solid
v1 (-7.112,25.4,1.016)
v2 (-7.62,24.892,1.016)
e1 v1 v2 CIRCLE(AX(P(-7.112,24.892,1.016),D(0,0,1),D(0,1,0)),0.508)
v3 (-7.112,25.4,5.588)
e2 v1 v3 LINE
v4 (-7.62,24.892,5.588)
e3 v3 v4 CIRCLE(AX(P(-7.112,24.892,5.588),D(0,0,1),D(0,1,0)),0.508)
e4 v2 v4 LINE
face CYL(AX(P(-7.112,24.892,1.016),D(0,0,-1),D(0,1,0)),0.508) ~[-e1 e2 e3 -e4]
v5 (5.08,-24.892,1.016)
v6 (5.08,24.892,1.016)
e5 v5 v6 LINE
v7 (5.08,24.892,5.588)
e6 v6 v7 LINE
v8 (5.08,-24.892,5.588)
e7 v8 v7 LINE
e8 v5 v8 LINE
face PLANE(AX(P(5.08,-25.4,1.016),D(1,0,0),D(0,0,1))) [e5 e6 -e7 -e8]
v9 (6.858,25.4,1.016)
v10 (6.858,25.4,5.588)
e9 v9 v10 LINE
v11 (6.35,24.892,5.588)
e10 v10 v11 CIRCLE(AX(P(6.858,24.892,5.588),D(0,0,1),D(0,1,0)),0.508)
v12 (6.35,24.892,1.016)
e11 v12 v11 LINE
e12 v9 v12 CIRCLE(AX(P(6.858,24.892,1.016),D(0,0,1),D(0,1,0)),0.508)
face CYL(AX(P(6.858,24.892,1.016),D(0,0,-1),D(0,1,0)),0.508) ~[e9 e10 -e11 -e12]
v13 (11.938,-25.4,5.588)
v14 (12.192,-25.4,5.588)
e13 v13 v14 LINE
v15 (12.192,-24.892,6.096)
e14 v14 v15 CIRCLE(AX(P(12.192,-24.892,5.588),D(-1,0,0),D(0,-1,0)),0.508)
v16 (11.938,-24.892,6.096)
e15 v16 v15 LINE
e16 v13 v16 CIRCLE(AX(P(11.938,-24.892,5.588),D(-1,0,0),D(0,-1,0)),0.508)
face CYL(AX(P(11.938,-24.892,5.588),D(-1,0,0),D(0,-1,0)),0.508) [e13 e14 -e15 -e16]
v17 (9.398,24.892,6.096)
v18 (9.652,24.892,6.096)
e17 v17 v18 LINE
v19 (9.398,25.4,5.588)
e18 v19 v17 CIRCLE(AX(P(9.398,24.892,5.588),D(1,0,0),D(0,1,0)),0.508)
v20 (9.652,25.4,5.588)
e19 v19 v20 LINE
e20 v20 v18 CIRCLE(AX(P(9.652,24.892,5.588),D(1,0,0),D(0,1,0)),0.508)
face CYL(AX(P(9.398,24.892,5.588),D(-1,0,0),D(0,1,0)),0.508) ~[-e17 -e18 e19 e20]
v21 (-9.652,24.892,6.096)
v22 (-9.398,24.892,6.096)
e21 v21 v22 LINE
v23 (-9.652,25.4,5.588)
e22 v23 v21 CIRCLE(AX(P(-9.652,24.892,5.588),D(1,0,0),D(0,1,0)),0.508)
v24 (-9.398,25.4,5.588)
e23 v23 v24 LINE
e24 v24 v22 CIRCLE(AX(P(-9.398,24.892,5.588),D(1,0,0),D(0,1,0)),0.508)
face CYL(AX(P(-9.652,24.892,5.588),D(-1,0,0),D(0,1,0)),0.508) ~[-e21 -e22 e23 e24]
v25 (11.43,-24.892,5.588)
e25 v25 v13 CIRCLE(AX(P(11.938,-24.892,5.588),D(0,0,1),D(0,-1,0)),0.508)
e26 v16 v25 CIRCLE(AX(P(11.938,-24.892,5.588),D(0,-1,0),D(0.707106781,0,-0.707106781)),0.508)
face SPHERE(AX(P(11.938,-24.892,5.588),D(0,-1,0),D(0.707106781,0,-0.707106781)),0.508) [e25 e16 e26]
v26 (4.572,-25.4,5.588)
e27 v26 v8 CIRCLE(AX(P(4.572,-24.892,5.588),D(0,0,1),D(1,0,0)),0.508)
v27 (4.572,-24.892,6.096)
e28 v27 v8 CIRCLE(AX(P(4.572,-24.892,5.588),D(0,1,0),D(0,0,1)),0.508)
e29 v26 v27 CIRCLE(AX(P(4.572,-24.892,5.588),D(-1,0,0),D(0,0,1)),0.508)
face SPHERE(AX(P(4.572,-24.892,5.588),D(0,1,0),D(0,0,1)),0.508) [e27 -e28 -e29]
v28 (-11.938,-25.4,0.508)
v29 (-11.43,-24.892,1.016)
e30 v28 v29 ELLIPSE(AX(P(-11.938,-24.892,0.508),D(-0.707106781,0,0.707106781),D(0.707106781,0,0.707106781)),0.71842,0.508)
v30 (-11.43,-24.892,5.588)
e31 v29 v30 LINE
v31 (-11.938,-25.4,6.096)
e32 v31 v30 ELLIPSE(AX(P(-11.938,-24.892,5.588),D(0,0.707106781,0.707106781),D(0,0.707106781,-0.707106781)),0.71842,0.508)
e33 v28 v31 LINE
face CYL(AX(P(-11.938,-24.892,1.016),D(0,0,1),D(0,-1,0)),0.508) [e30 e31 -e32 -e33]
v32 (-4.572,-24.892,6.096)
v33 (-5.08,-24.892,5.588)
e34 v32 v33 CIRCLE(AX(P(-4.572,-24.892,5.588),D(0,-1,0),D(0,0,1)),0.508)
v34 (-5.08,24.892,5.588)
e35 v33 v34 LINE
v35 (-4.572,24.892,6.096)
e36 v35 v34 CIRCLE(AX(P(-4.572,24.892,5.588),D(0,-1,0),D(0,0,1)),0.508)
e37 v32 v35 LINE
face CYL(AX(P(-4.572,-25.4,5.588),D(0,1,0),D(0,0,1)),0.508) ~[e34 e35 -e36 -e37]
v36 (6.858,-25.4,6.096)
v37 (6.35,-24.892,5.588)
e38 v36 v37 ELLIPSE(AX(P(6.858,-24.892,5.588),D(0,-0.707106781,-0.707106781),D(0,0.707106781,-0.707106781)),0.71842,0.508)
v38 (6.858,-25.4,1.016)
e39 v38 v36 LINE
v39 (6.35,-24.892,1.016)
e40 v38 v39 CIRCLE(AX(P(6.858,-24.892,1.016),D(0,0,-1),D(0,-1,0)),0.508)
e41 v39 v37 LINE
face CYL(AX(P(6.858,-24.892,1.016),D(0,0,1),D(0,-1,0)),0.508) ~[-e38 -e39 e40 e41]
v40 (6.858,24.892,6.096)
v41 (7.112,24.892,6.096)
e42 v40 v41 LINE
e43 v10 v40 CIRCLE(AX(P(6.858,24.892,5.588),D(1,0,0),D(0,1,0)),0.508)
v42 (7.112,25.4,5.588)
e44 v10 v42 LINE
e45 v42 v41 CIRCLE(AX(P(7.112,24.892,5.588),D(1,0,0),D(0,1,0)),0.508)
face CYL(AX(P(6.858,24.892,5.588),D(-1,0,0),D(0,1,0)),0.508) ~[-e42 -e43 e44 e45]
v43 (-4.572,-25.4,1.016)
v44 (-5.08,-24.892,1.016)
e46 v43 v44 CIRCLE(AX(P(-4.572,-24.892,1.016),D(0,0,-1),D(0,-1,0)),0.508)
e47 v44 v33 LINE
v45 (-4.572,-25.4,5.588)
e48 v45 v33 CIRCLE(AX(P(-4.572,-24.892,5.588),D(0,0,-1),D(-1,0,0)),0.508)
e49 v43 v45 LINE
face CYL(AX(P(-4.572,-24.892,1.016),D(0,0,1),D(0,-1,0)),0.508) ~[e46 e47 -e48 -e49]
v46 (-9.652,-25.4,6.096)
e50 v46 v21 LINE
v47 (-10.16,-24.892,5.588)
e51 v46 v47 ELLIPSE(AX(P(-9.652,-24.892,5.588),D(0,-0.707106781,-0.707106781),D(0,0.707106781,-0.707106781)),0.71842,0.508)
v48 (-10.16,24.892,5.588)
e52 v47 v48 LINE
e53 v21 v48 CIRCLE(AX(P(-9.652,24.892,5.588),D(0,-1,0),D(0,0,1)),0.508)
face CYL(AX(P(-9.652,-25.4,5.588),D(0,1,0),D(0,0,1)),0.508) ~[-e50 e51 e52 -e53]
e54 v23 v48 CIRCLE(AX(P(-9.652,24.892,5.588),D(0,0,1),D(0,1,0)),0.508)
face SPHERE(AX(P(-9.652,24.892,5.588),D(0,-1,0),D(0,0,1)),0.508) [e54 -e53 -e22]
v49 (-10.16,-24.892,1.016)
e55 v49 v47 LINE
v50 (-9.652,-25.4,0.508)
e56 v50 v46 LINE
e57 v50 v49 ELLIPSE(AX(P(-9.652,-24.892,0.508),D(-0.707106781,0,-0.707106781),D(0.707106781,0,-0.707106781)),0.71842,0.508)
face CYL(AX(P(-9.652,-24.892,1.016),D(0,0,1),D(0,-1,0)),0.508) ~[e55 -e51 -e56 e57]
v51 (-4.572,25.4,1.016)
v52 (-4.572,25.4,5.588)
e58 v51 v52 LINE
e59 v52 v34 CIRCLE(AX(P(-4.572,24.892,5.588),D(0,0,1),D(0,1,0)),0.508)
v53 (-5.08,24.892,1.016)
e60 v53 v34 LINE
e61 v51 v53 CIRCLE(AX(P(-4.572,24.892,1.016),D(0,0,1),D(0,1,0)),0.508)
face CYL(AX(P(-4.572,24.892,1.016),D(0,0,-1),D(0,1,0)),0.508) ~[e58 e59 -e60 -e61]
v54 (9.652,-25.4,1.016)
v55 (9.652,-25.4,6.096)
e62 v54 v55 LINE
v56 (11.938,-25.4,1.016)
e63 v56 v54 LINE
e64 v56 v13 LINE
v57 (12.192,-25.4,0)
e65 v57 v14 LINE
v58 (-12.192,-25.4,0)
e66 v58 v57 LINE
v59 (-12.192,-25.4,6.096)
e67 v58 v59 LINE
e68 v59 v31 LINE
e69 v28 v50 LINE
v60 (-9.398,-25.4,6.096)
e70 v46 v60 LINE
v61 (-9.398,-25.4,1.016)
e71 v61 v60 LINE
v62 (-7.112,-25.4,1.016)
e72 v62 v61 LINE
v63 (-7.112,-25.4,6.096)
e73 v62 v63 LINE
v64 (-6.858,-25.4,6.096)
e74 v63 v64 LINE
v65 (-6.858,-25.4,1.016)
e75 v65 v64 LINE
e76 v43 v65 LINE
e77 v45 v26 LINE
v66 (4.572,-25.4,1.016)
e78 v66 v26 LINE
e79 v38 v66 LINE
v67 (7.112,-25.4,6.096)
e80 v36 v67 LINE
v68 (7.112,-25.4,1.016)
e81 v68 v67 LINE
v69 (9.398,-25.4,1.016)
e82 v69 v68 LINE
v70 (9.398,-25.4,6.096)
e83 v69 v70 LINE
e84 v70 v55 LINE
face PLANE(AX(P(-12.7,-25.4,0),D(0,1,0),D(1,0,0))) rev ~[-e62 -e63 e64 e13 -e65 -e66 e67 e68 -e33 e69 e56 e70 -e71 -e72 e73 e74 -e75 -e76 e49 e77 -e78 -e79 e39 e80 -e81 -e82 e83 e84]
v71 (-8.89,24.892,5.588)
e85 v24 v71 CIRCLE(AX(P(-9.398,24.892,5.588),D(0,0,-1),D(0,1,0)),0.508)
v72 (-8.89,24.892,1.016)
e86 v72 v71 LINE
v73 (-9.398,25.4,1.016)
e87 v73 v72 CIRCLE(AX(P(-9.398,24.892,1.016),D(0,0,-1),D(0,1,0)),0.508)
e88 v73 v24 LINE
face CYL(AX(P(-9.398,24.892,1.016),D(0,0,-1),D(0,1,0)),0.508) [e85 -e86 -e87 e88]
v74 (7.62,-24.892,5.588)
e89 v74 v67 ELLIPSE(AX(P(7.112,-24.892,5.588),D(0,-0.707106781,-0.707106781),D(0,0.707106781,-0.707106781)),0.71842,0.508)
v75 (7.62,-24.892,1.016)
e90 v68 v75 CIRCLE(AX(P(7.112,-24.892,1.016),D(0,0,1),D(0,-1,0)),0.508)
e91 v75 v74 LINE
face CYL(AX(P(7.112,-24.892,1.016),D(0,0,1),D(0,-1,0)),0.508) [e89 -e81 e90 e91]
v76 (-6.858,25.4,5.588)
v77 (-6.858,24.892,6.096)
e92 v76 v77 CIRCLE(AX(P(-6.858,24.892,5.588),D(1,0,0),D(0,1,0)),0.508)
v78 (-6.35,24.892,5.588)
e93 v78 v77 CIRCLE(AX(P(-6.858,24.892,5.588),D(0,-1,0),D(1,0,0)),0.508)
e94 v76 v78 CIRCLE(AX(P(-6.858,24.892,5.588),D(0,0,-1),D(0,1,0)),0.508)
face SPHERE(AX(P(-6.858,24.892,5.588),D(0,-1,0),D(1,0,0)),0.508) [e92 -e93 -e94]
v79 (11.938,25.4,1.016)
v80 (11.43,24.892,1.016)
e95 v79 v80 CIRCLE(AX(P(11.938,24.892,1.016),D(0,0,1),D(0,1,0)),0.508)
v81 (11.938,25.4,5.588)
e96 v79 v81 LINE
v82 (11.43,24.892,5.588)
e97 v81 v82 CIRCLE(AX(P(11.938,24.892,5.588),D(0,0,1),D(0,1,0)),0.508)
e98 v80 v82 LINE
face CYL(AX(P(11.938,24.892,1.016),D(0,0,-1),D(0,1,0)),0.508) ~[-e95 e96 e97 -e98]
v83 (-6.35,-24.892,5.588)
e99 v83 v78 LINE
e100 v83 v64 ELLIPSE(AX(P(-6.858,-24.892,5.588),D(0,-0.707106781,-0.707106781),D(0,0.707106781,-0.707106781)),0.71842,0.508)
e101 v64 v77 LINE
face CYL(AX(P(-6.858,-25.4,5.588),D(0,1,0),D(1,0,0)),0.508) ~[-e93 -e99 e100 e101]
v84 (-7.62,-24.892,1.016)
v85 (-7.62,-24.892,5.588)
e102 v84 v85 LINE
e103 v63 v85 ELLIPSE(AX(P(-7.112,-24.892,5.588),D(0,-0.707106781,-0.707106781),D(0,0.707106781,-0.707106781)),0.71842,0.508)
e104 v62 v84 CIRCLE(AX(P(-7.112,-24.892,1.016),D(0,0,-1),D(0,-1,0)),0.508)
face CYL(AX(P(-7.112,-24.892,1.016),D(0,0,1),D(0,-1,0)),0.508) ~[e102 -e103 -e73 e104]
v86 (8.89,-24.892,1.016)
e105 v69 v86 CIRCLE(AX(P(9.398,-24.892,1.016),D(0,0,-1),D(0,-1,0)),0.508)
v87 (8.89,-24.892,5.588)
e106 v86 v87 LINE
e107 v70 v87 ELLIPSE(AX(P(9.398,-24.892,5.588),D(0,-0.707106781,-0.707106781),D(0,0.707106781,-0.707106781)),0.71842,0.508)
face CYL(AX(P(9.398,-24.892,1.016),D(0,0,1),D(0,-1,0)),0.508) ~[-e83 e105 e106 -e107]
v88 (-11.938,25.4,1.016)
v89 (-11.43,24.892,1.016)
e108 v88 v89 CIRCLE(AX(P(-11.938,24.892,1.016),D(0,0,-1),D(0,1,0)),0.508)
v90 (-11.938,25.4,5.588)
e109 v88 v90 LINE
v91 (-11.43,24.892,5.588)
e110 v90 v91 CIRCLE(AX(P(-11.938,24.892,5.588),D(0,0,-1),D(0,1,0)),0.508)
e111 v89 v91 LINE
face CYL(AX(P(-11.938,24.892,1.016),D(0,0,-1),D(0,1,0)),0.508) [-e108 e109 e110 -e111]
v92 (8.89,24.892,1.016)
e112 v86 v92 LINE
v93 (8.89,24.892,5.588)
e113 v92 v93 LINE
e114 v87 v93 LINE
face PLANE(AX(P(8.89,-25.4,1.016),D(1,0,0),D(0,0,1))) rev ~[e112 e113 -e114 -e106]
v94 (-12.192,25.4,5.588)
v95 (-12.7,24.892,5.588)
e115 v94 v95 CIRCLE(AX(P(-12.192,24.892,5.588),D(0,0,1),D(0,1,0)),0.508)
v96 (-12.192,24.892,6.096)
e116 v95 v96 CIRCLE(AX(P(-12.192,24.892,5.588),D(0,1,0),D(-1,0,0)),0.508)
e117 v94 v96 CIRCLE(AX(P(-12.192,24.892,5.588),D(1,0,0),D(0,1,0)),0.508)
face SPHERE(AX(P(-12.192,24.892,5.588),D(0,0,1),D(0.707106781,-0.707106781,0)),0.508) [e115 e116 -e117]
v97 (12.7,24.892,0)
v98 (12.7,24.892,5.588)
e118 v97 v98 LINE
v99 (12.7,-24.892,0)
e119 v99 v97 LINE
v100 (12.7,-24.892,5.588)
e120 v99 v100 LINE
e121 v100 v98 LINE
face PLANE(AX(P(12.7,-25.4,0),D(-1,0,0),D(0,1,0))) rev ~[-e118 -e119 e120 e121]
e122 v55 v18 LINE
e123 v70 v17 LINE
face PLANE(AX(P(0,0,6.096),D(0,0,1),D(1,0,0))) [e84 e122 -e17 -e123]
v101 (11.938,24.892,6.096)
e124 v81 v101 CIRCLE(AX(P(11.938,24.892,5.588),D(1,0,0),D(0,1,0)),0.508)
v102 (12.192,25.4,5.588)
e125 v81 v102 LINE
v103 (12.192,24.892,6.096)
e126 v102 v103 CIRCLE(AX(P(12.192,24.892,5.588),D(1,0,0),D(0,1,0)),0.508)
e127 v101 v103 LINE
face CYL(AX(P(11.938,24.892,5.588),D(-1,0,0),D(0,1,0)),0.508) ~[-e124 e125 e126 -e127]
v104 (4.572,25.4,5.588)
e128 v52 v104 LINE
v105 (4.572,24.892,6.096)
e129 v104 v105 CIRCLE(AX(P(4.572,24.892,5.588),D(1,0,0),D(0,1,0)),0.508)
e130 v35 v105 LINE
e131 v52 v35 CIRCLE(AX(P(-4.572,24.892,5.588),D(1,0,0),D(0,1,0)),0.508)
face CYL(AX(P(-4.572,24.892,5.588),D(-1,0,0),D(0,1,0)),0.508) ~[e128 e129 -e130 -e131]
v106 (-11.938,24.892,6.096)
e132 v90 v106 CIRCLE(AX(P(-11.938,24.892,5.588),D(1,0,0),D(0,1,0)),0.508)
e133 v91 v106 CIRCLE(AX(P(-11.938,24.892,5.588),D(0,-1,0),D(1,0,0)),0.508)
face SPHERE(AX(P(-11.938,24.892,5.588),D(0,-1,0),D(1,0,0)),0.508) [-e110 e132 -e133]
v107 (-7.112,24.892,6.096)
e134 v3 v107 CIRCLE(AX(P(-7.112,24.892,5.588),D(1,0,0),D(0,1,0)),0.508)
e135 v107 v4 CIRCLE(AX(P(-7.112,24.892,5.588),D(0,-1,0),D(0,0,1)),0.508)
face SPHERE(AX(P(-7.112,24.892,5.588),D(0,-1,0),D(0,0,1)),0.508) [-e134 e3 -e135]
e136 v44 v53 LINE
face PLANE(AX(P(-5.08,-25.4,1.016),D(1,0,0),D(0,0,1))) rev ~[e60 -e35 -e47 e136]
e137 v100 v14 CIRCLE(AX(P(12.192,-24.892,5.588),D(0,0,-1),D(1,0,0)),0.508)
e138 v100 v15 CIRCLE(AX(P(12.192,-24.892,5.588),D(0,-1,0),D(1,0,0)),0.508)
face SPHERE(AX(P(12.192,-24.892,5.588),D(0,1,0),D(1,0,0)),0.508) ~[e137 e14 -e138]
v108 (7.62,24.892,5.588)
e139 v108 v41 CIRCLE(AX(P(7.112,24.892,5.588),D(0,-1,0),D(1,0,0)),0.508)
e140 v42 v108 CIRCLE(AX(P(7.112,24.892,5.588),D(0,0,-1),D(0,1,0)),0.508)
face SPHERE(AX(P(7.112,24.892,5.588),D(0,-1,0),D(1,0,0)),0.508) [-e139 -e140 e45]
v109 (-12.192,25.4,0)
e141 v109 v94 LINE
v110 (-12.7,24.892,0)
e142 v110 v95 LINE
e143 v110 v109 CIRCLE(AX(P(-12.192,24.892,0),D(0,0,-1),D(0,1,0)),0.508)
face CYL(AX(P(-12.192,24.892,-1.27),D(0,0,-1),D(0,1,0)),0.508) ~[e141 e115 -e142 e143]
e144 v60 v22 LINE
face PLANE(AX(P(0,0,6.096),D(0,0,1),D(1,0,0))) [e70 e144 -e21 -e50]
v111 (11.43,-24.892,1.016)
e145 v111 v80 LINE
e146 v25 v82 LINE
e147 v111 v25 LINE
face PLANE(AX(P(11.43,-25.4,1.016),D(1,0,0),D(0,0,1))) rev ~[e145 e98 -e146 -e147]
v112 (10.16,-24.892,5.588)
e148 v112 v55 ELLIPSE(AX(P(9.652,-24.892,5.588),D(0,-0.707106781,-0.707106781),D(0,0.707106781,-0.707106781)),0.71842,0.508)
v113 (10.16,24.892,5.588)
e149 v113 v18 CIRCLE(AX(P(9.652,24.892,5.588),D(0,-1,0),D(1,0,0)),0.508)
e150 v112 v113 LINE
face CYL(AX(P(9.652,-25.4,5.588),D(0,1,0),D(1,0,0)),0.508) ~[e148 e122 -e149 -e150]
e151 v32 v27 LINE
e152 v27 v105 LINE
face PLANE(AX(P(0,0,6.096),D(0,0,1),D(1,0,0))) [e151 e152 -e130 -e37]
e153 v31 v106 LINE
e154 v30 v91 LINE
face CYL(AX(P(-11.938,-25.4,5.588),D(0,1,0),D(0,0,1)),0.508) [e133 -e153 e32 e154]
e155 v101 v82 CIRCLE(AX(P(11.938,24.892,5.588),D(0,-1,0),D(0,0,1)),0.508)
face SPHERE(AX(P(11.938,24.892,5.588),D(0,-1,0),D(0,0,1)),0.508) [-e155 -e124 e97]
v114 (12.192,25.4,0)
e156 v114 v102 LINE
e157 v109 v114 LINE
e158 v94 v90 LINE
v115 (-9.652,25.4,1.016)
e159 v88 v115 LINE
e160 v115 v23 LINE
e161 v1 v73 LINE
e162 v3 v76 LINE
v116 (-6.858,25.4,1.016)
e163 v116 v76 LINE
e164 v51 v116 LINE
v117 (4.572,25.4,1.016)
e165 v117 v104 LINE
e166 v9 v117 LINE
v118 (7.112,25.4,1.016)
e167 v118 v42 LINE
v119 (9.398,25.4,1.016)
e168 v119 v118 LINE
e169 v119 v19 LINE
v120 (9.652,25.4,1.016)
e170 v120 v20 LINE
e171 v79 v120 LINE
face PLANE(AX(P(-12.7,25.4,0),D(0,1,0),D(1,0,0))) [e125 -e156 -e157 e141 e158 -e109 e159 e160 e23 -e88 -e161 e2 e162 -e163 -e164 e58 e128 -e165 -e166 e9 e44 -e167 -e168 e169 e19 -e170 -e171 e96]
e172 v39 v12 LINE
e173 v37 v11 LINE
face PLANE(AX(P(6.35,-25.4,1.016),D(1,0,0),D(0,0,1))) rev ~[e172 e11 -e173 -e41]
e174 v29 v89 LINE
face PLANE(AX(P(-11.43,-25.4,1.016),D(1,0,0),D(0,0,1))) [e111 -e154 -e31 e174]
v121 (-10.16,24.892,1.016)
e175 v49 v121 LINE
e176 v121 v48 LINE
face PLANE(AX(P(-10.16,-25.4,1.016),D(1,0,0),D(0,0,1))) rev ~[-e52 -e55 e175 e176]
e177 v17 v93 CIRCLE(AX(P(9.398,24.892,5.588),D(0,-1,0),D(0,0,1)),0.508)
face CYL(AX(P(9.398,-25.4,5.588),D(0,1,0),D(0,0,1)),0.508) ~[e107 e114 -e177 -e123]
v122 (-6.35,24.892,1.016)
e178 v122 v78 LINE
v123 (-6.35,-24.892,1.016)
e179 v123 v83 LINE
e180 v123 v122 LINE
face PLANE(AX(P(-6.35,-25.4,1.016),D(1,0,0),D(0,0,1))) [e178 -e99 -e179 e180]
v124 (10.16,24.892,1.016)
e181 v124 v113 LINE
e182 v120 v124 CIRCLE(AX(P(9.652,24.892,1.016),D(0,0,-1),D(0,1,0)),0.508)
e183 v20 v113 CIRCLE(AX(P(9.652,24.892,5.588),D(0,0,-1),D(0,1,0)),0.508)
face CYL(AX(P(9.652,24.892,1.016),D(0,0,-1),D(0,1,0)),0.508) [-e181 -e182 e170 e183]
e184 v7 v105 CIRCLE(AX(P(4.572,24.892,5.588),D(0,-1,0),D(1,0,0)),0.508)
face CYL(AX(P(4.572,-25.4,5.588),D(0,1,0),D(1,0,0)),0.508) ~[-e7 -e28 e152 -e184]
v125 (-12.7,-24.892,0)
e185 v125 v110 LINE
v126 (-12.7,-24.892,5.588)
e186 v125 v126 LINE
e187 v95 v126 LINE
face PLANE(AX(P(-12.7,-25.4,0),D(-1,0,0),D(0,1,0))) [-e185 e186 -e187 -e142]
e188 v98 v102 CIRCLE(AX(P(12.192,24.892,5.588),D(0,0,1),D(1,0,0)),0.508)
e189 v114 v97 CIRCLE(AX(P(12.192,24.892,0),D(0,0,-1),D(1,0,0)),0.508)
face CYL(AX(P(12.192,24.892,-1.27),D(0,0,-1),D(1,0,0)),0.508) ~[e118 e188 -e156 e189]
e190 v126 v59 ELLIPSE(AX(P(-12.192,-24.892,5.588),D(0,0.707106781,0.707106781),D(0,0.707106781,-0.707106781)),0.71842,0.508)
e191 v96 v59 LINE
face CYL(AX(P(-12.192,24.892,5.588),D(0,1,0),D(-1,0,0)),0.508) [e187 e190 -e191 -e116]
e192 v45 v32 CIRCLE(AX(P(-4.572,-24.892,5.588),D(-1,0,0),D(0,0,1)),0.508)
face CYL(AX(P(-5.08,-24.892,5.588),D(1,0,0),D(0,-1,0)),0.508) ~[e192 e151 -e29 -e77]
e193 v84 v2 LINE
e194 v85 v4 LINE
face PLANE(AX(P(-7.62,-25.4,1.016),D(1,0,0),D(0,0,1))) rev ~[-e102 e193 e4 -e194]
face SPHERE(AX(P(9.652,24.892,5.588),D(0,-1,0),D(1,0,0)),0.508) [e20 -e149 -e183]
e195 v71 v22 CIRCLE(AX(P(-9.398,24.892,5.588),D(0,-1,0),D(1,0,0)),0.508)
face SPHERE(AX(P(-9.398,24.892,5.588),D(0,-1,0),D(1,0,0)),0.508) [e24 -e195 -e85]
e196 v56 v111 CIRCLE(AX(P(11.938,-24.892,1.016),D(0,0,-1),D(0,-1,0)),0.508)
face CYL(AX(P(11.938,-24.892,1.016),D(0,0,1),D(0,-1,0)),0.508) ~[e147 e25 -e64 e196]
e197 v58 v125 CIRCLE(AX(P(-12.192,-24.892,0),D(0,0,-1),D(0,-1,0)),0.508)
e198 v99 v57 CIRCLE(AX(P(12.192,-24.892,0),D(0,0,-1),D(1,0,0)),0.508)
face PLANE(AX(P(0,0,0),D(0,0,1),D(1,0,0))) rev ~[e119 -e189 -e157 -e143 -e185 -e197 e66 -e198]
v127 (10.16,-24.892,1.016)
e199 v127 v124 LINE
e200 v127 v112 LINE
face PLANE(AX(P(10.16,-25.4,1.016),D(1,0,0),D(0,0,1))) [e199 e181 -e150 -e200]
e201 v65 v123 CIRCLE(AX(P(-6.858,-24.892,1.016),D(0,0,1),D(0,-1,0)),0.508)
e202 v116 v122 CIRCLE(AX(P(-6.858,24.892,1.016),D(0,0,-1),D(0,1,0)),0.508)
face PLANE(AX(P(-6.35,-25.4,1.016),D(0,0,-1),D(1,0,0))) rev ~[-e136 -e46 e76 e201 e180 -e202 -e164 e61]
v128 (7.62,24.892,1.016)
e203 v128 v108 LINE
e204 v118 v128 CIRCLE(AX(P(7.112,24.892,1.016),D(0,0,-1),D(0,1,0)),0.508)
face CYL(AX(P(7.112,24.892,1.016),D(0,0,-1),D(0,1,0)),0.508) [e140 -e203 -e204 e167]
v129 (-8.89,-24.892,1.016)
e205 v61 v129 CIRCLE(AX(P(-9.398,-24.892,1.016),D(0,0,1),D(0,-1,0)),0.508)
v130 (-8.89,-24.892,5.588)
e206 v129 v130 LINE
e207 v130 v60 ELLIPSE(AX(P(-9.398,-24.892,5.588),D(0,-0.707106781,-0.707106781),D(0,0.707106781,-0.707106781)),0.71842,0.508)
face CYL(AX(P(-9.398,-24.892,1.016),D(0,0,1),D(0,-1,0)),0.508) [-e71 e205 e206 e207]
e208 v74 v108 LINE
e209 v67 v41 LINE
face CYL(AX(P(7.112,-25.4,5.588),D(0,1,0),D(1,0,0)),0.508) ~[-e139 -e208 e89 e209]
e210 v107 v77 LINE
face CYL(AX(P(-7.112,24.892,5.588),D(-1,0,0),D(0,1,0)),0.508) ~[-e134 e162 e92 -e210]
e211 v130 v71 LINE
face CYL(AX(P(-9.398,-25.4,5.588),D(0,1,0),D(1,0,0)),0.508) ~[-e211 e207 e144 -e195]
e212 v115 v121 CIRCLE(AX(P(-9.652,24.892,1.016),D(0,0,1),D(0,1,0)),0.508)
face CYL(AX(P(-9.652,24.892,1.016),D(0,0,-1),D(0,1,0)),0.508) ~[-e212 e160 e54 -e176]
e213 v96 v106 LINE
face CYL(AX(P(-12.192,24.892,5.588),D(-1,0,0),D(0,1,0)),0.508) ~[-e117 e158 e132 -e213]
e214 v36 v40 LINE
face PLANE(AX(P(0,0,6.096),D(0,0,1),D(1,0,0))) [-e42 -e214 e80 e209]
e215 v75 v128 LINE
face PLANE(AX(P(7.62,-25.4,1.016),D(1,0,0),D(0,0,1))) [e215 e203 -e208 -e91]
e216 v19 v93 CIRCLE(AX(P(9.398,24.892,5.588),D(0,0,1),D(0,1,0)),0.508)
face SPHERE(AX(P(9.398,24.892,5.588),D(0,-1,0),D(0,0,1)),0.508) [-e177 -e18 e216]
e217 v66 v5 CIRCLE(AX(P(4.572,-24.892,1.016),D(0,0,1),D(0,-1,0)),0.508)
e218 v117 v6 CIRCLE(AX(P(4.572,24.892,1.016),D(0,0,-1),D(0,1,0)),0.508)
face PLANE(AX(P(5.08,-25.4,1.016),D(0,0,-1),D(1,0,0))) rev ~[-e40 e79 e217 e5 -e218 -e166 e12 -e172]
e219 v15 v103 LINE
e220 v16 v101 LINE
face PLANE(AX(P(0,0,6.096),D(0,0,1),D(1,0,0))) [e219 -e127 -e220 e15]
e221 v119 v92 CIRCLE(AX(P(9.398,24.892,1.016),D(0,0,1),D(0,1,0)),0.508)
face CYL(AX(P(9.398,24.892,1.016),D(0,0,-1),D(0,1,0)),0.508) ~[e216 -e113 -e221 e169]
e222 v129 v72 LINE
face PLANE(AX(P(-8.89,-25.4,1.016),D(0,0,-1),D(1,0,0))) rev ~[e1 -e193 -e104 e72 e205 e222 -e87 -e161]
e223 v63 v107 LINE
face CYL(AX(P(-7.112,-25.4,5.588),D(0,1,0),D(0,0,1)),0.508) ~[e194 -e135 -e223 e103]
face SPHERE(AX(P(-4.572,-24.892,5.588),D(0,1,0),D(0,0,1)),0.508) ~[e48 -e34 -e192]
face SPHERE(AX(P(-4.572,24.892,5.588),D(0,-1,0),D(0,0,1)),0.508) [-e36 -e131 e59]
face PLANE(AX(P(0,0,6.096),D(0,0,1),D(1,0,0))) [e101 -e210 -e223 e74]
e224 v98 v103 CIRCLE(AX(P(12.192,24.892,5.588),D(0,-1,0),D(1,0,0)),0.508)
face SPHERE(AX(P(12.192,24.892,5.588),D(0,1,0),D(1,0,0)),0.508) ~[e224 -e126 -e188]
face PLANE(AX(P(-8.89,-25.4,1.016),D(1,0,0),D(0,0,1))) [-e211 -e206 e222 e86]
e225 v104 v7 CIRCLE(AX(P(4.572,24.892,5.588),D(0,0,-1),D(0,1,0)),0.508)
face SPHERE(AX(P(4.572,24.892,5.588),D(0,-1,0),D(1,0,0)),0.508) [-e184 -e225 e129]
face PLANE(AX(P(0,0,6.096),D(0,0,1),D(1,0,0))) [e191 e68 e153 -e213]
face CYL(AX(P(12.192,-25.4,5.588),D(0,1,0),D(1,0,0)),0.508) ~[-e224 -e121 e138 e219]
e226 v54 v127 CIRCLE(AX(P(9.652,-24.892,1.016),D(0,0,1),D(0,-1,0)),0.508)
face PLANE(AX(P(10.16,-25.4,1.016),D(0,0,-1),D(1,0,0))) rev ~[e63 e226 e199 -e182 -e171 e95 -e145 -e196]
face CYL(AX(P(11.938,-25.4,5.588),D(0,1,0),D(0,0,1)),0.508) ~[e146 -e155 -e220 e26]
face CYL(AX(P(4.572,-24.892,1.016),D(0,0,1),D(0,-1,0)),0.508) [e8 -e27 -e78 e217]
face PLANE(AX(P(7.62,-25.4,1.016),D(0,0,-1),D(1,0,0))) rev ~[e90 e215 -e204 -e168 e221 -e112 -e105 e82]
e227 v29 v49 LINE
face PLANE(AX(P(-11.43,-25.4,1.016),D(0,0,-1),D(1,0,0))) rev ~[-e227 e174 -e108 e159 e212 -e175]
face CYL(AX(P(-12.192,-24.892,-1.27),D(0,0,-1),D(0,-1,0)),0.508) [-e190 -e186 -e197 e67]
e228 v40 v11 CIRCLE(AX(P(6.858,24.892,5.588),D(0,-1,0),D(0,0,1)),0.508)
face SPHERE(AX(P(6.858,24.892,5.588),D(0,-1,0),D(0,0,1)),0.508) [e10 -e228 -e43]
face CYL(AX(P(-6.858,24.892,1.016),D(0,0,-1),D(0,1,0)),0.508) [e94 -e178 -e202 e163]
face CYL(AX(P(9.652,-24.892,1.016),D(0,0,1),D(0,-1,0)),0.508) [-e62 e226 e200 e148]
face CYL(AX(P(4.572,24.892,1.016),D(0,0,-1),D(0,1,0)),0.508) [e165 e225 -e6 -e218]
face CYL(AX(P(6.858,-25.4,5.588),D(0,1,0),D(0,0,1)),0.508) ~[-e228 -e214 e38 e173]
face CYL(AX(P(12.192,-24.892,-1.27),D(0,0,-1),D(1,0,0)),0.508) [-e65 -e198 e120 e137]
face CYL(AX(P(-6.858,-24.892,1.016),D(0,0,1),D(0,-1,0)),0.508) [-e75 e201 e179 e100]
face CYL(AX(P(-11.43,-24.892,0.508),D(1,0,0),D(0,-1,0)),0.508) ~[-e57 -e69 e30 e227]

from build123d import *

# Parameters (mm, degrees)
F0_W         = 25.4
F0_H         = 50.8
F1_DEPTH     = 6.096
F2_W         = 1.27
F2_H         = 5.08
F3_DEPTH     = 50.8
F4_R         = 0.508
F5_T1_DEPTH  = 4.572
F5_T3_DEPTH  = 6.858
F5_T5_DEPTH  = 51.562
F5_T7_DEPTH  = 8.636
F5_T9_DEPTH  = 0.254
F5_T11_DEPTH = 0.254
F5_T13_DEPTH = 0.254
F5_T15_DEPTH = 0.254
F5_T17_DEPTH = 9.144
F5_T19_DEPTH = 0.254
F5_T21_DEPTH = 0.254
F5_S25_W     = 0.508
F5_S25_H     = 0.508
F5_T26_DEPTH = 0.508
F5_S31_W     = 0.508
F5_S31_H     = 0.508
F5_T32_DEPTH = 0.508
F5_T36_ANGLE = 90
F5_T38_ANGLE = 90
F5_T40_ANGLE = 90
F5_T42_ANGLE = 90
F5_T44_ANGLE = 90
F5_T46_ANGLE = 90
F5_T48_ANGLE = 90
F5_T50_ANGLE = 90
F5_T52_ANGLE = 90
F5_T54_ANGLE = 90
F5_T56_ANGLE = 90
F5_T58_ANGLE = 90
F5_T60_ANGLE = 90
F5_T62_ANGLE = 90


# Not quite as in the source:
# - a fillet or chamfer that OpenCascade refuses, or shapes differently, is made with other operations: its cross-section is extruded or revolved along the edge and cut away or added


with BuildPart() as f1:
    # F0 (on Top) → F1 (new body)
    with BuildSketch(Plane.XY):
        Rectangle(F0_W, F0_H)
    extrude(amount=F1_DEPTH)

    # F2 (on face) → F3 (cut)
    with BuildSketch(Plane.XZ.offset(25.4)):
        with Locations((-10.795, 3.556)):
            Rectangle(F2_W, F2_H)
        with Locations((-8.255, 3.556)):
            Rectangle(F2_W, F2_H)
        with Locations((-5.715, 3.556)):
            Rectangle(F2_W, F2_H)
        with Locations((5.715, 3.556)):
            Rectangle(F2_W, F2_H)
        with Locations((8.255, 3.556)):
            Rectangle(F2_W, F2_H)
        with Locations((10.795, 3.556)):
            Rectangle(F2_W, F2_H)
    extrude(amount=-F3_DEPTH, mode=Mode.SUBTRACT)

    # F4
    f4_edges = [f1.edges().sort_by_distance(p)[0] for p in [
        (-11.43, 0, 6.096),
        (-10.16, 0, 6.096),
        (-8.89, 0, 6.096),
        (-7.62, 0, 6.096),
        (-6.35, 0, 6.096),
        (-5.08, 0, 6.096),
        (5.08, 0, 6.096),
        (6.35, 0, 6.096),
        (7.62, 0, 6.096),
        (8.89, 0, 6.096),
        (10.16, 0, 6.096),
        (11.43, 0, 6.096),
        (12.7, 0, 6.096),
        (0, -25.4, 6.096),
        (-11.43, -25.4, 3.556),
        (-10.795, -25.4, 1.016),
        (-10.16, -25.4, 3.556),
        (-8.89, -25.4, 3.556),
        (-7.62, -25.4, 3.556),
        (-6.35, -25.4, 3.556),
        (-5.08, -25.4, 3.556),
        (5.08, -25.4, 3.556),
        (7.62, -25.4, 3.556),
        (6.35, -25.4, 3.556),
        (10.16, -25.4, 3.556),
        (8.89, -25.4, 3.556),
        (11.43, -25.4, 3.556),
    ]]
    fillet(f4_edges, radius=F4_R)

    # F5: fillet of radius 0.508 on 11 edges, made by hand

    # F5_s2 → F5_t1 (cut)
    with BuildSketch(Plane.XY.offset(1.016)):
        with BuildLine():
            ThreePointArc((9.398, 25.4), (9.0387897552, 25.2512102448), (8.89, 24.892))
            Line((8.89, 24.892), (8.89, 25.4))
            Line((8.89, 25.4), (9.398, 25.4))
        make_face()
        with BuildLine():
            ThreePointArc((7.112, 25.4), (7.4712102448, 25.2512102448), (7.62, 24.892))
            Line((7.62, 24.892), (7.62, 25.4))
            Line((7.62, 25.4), (7.112, 25.4))
        make_face()
        with BuildLine():
            ThreePointArc((4.572, 25.4), (4.9312102448, 25.2512102448), (5.08, 24.892))
            Line((5.08, 24.892), (5.08, 25.4))
            Line((5.08, 25.4), (4.572, 25.4))
        make_face()
        with BuildLine():
            ThreePointArc((-7.112, 25.4), (-7.4712102448, 25.2512102448), (-7.62, 24.892))
            Line((-7.62, 24.892), (-7.62, 25.4))
            Line((-7.62, 25.4), (-7.112, 25.4))
        make_face()
        with BuildLine():
            ThreePointArc((-9.398, 25.4), (-9.0387897552, 25.2512102448), (-8.89, 24.892))
            Line((-8.89, 24.892), (-8.89, 25.4))
            Line((-8.89, 25.4), (-9.398, 25.4))
        make_face()
        with BuildLine():
            ThreePointArc((-11.938, 25.4), (-11.5787897552, 25.2512102448), (-11.43, 24.892))
            Line((-11.43, 24.892), (-11.43, 25.4))
            Line((-11.43, 25.4), (-11.938, 25.4))
        make_face()
        with BuildLine():
            ThreePointArc((11.938, 25.4), (11.5787897552, 25.2512102448), (11.43, 24.892))
            Line((11.43, 24.892), (11.43, 25.4))
            Line((11.43, 25.4), (11.938, 25.4))
        make_face()
        with BuildLine():
            ThreePointArc((-9.652, 25.4), (-10.0112102448, 25.2512102448), (-10.16, 24.892))
            Line((-10.16, 24.892), (-10.16, 25.4))
            Line((-10.16, 25.4), (-9.652, 25.4))
        make_face()
        with BuildLine():
            ThreePointArc((-6.858, 25.4), (-6.4987897552, 25.2512102448), (-6.35, 24.892))
            Line((-6.35, 24.892), (-6.35, 25.4))
            Line((-6.35, 25.4), (-6.858, 25.4))
        make_face()
        with BuildLine():
            ThreePointArc((-4.572, 25.4), (-4.9312102448, 25.2512102448), (-5.08, 24.892))
            Line((-5.08, 24.892), (-5.08, 25.4))
            Line((-5.08, 25.4), (-4.572, 25.4))
        make_face()
        with BuildLine():
            ThreePointArc((6.858, 25.4), (6.4987897552, 25.2512102448), (6.35, 24.892))
            Line((6.35, 24.892), (6.35, 25.4))
            Line((6.35, 25.4), (6.858, 25.4))
        make_face()
        with BuildLine():
            ThreePointArc((9.652, 25.4), (10.0112102448, 25.2512102448), (10.16, 24.892))
            Line((10.16, 24.892), (10.16, 25.4))
            Line((10.16, 25.4), (9.652, 25.4))
        make_face()
    extrude(amount=F5_T1_DEPTH, mode=Mode.SUBTRACT)

    # F5_s4 → F5_t3 (cut)
    with BuildSketch(Plane.XY.offset(-1.27)):
        with BuildLine():
            ThreePointArc((-12.192, 25.4), (-12.5512102448, 25.2512102448), (-12.7, 24.892))
            Line((-12.7, 24.892), (-12.7, 25.4))
            Line((-12.7, 25.4), (-12.192, 25.4))
        make_face()
        with BuildLine():
            ThreePointArc((12.7, -24.892), (12.5512102448, -25.2512102448), (12.192, -25.4))
            Line((12.192, -25.4), (12.7, -25.4))
            Line((12.7, -25.4), (12.7, -24.892))
        make_face()
        with BuildLine():
            ThreePointArc((12.7, 24.892), (12.5512102448, 25.2512102448), (12.192, 25.4))
            Line((12.192, 25.4), (12.7, 25.4))
            Line((12.7, 25.4), (12.7, 24.892))
        make_face()
    extrude(amount=F5_T3_DEPTH, mode=Mode.SUBTRACT)

    # F5_s6 → F5_t5 (cut)
    with BuildSketch(Plane.XZ.offset(-24.892)):
        with BuildLine():
            ThreePointArc((-12.7, 5.588), (-12.5512102448, 5.9472102448), (-12.192, 6.096))
            Line((-12.192, 6.096), (-12.7, 6.096))
            Line((-12.7, 6.096), (-12.7, 5.588))
        make_face()
    extrude(amount=F5_T5_DEPTH, mode=Mode.SUBTRACT)

    # F5_s8 → F5_t7 (cut)
    with BuildSketch(Plane.XY.offset(-1.27)):
        with BuildLine():
            ThreePointArc((-12.192, -25.4), (-12.5512102448, -25.2512102448), (-12.7, -24.892))
            Line((-12.7, -24.892), (-12.7, -25.4))
            Line((-12.7, -25.4), (-12.192, -25.4))
        make_face()
    extrude(amount=F5_T7_DEPTH, mode=Mode.SUBTRACT)

    # F5_s10 → F5_t9 (cut)
    with BuildSketch(Plane.YZ.offset(11.938)):
        with BuildLine():
            ThreePointArc((-25.4, 5.588), (-25.2512102448, 5.9472102448), (-24.892, 6.096))
            Line((-24.892, 6.096), (-25.4, 6.096))
            Line((-25.4, 6.096), (-25.4, 5.588))
        make_face()
        with BuildLine():
            ThreePointArc((25.4, 5.588), (25.2512102448, 5.9472102448), (24.892, 6.096))
            Line((24.892, 6.096), (25.4, 6.096))
            Line((25.4, 6.096), (25.4, 5.588))
        make_face()
    extrude(amount=F5_T9_DEPTH, mode=Mode.SUBTRACT)

    # F5_s12 → F5_t11 (cut)
    with BuildSketch(Plane.YZ.offset(-12.192)):
        with BuildLine():
            ThreePointArc((25.4, 5.588), (25.2512102448, 5.9472102448), (24.892, 6.096))
            Line((24.892, 6.096), (25.4, 6.096))
            Line((25.4, 6.096), (25.4, 5.588))
        make_face()
    extrude(amount=F5_T11_DEPTH, mode=Mode.SUBTRACT)

    # F5_s14 → F5_t13 (cut)
    with BuildSketch(Plane.YZ.offset(-9.652)):
        with BuildLine():
            ThreePointArc((25.4, 5.588), (25.2512102448, 5.9472102448), (24.892, 6.096))
            Line((24.892, 6.096), (25.4, 6.096))
            Line((25.4, 6.096), (25.4, 5.588))
        make_face()
    extrude(amount=F5_T13_DEPTH, mode=Mode.SUBTRACT)

    # F5_s16 → F5_t15 (cut)
    with BuildSketch(Plane.YZ.offset(-7.112)):
        with BuildLine():
            ThreePointArc((25.4, 5.588), (25.2512102448, 5.9472102448), (24.892, 6.096))
            Line((24.892, 6.096), (25.4, 6.096))
            Line((25.4, 6.096), (25.4, 5.588))
        make_face()
    extrude(amount=F5_T15_DEPTH, mode=Mode.SUBTRACT)

    # F5_s18 → F5_t17 (cut)
    with BuildSketch(Plane.YZ.offset(-4.572)):
        with BuildLine():
            ThreePointArc((25.4, 5.588), (25.2512102448, 5.9472102448), (24.892, 6.096))
            Line((24.892, 6.096), (25.4, 6.096))
            Line((25.4, 6.096), (25.4, 5.588))
        make_face()
    extrude(amount=F5_T17_DEPTH, mode=Mode.SUBTRACT)

    # F5_s20 → F5_t19 (cut)
    with BuildSketch(Plane.YZ.offset(6.858)):
        with BuildLine():
            ThreePointArc((25.4, 5.588), (25.2512102448, 5.9472102448), (24.892, 6.096))
            Line((24.892, 6.096), (25.4, 6.096))
            Line((25.4, 6.096), (25.4, 5.588))
        make_face()
    extrude(amount=F5_T19_DEPTH, mode=Mode.SUBTRACT)

    # F5_s22 → F5_t21 (cut)
    with BuildSketch(Plane.YZ.offset(9.398)):
        with BuildLine():
            ThreePointArc((25.4, 5.588), (25.2512102448, 5.9472102448), (24.892, 6.096))
            Line((24.892, 6.096), (25.4, 6.096))
            Line((25.4, 6.096), (25.4, 5.588))
        make_face()
    extrude(amount=F5_T21_DEPTH, mode=Mode.SUBTRACT)


with BuildPart() as f5_tool24:
    # F5_s25 → F5_t26 (new body)
    with BuildSketch(Plane.XZ.offset(24.892)):
        with Locations((11.684, 5.842)):
            Rectangle(F5_S25_W, F5_S25_H)
    extrude(amount=F5_T26_DEPTH)

    # F5_s27 → F5_t28 (revolve, cut)
    with BuildSketch(Plane(origin=(11.938, -24.892, 5.588), x_dir=(0.7071067812, 0, -0.7071067812), z_dir=(-0.7071067812, 0, -0.7071067812))):
        with BuildLine():
            ThreePointArc((0, -0.508), (0.508, 0), (0, 0.508))
            Line((0, 0.508), (0, -0.508))
        make_face()
    revolve(axis=Axis((11.938, -24.892, 5.588), (0, -1, 0)), mode=Mode.SUBTRACT)


with BuildPart() as f1_1:
    add(f1.part)

    # F5_t23: cut F5_tool24
    add(f5_tool24.part, mode=Mode.SUBTRACT)


with BuildPart() as f5_tool30:
    # F5_s31 → F5_t32 (new body)
    with BuildSketch(Plane.XY.offset(5.588)):
        with Locations((-12.446, 25.146)):
            Rectangle(F5_S31_W, F5_S31_H)
    extrude(amount=F5_T32_DEPTH)

    # F5_s33 → F5_t34 (revolve, cut)
    with BuildSketch(Plane(origin=(-12.192, 24.892, 5.588), x_dir=(0.7071067812, -0.7071067812, 0), z_dir=(-0.7071067812, -0.7071067812, 0))):
        with BuildLine():
            ThreePointArc((0, -0.508), (0.508, 0), (0, 0.508))
            Line((0, 0.508), (0, -0.508))
        make_face()
    revolve(axis=Axis((-12.192, 24.892, 5.588), (0, 0, 1)), mode=Mode.SUBTRACT)


with BuildPart() as f1_2:
    add(f1_1.part)

    # F5_t29: cut F5_tool30
    add(f5_tool30.part, mode=Mode.SUBTRACT)

    # F5_s35 → F5_t36 (revolve, cut)
    with BuildSketch(Plane.XY.offset(5.588)):
        with BuildLine():
            ThreePointArc((12.192, -25.4), (12.5512102448, -25.2512102448), (12.7, -24.892))
            Line((12.7, -24.892), (12.7, -25.4))
            Line((12.7, -25.4), (12.192, -25.4))
        make_face()
    revolve(axis=Axis((12.192, -25.4, 5.588), (0, -1, 0)), revolution_arc=F5_T36_ANGLE, mode=Mode.SUBTRACT)

    # F5_s37 → F5_t38 (revolve, cut)
    with BuildSketch(Plane.YZ.offset(11.938)):
        with BuildLine():
            ThreePointArc((25.4, 5.588), (25.2512102448, 5.9472102448), (24.892, 6.096))
            Line((24.892, 6.096), (25.4, 6.096))
            Line((25.4, 6.096), (25.4, 5.588))
        make_face()
    revolve(axis=Axis((11.938, 25.4, 5.588), (0, -1, 0)), revolution_arc=F5_T38_ANGLE, mode=Mode.SUBTRACT)

    # F5_s39 → F5_t40 (revolve, cut)
    with BuildSketch(Plane.XY.offset(5.588)):
        with BuildLine():
            ThreePointArc((12.7, 24.892), (12.5512102448, 25.2512102448), (12.192, 25.4))
            Line((12.192, 25.4), (12.7, 25.4))
            Line((12.7, 25.4), (12.7, 24.892))
        make_face()
    revolve(axis=Axis((12.192, 25.4, 5.588), (0, -1, 0)), revolution_arc=F5_T40_ANGLE, mode=Mode.SUBTRACT)

    # F5_s41 → F5_t42 (revolve, cut)
    with BuildSketch(Plane.XY.offset(5.588)):
        with BuildLine():
            ThreePointArc((-11.938, 25.4), (-11.5787897552, 25.2512102448), (-11.43, 24.892))
            Line((-11.43, 24.892), (-11.43, 25.4))
            Line((-11.43, 25.4), (-11.938, 25.4))
        make_face()
    revolve(axis=Axis((-11.938, 25.4, 5.588), (0, -1, 0)), revolution_arc=F5_T42_ANGLE, mode=Mode.SUBTRACT)

    # F5_s43 → F5_t44 (revolve, cut)
    with BuildSketch(Plane.XY.offset(5.588)):
        with BuildLine():
            ThreePointArc((-9.398, 25.4), (-9.0387897552, 25.2512102448), (-8.89, 24.892))
            Line((-8.89, 24.892), (-8.89, 25.4))
            Line((-8.89, 25.4), (-9.398, 25.4))
        make_face()
    revolve(axis=Axis((-9.398, 25.4, 5.588), (0, -1, 0)), revolution_arc=F5_T44_ANGLE, mode=Mode.SUBTRACT)

    # F5_s45 → F5_t46 (revolve, cut)
    with BuildSketch(Plane.YZ.offset(-9.652)):
        with BuildLine():
            ThreePointArc((25.4, 5.588), (25.2512102448, 5.9472102448), (24.892, 6.096))
            Line((24.892, 6.096), (25.4, 6.096))
            Line((25.4, 6.096), (25.4, 5.588))
        make_face()
    revolve(axis=Axis((-9.652, 25.4, 5.588), (0, -1, 0)), revolution_arc=F5_T46_ANGLE, mode=Mode.SUBTRACT)

    # F5_s47 → F5_t48 (revolve, cut)
    with BuildSketch(Plane.YZ.offset(-7.112)):
        with BuildLine():
            ThreePointArc((25.4, 5.588), (25.2512102448, 5.9472102448), (24.892, 6.096))
            Line((24.892, 6.096), (25.4, 6.096))
            Line((25.4, 6.096), (25.4, 5.588))
        make_face()
    revolve(axis=Axis((-7.112, 25.4, 5.588), (0, -1, 0)), revolution_arc=F5_T48_ANGLE, mode=Mode.SUBTRACT)

    # F5_s49 → F5_t50 (revolve, cut)
    with BuildSketch(Plane.XY.offset(5.588)):
        with BuildLine():
            ThreePointArc((-6.858, 25.4), (-6.4987897552, 25.2512102448), (-6.35, 24.892))
            Line((-6.35, 24.892), (-6.35, 25.4))
            Line((-6.35, 25.4), (-6.858, 25.4))
        make_face()
    revolve(axis=Axis((-6.858, 25.4, 5.588), (0, -1, 0)), revolution_arc=F5_T50_ANGLE, mode=Mode.SUBTRACT)

    # F5_s51 → F5_t52 (revolve, cut)
    with BuildSketch(Plane.XY.offset(5.588)):
        with BuildLine():
            ThreePointArc((4.572, 25.4), (4.9312102448, 25.2512102448), (5.08, 24.892))
            Line((5.08, 24.892), (5.08, 25.4))
            Line((5.08, 25.4), (4.572, 25.4))
        make_face()
    revolve(axis=Axis((4.572, 25.4, 5.588), (0, -1, 0)), revolution_arc=F5_T52_ANGLE, mode=Mode.SUBTRACT)

    # F5_s53 → F5_t54 (revolve, cut)
    with BuildSketch(Plane.YZ.offset(-4.572)):
        with BuildLine():
            ThreePointArc((25.4, 5.588), (25.2512102448, 5.9472102448), (24.892, 6.096))
            Line((24.892, 6.096), (25.4, 6.096))
            Line((25.4, 6.096), (25.4, 5.588))
        make_face()
    revolve(axis=Axis((-4.572, 25.4, 5.588), (0, -1, 0)), revolution_arc=F5_T54_ANGLE, mode=Mode.SUBTRACT)

    # F5_s55 → F5_t56 (revolve, cut)
    with BuildSketch(Plane.XY.offset(5.588)):
        with BuildLine():
            ThreePointArc((7.112, 25.4), (7.4712102448, 25.2512102448), (7.62, 24.892))
            Line((7.62, 24.892), (7.62, 25.4))
            Line((7.62, 25.4), (7.112, 25.4))
        make_face()
    revolve(axis=Axis((7.112, 25.4, 5.588), (0, -1, 0)), revolution_arc=F5_T56_ANGLE, mode=Mode.SUBTRACT)

    # F5_s57 → F5_t58 (revolve, cut)
    with BuildSketch(Plane.YZ.offset(6.858)):
        with BuildLine():
            ThreePointArc((25.4, 5.588), (25.2512102448, 5.9472102448), (24.892, 6.096))
            Line((24.892, 6.096), (25.4, 6.096))
            Line((25.4, 6.096), (25.4, 5.588))
        make_face()
    revolve(axis=Axis((6.858, 25.4, 5.588), (0, -1, 0)), revolution_arc=F5_T58_ANGLE, mode=Mode.SUBTRACT)

    # F5_s59 → F5_t60 (revolve, cut)
    with BuildSketch(Plane.YZ.offset(9.398)):
        with BuildLine():
            ThreePointArc((25.4, 5.588), (25.2512102448, 5.9472102448), (24.892, 6.096))
            Line((24.892, 6.096), (25.4, 6.096))
            Line((25.4, 6.096), (25.4, 5.588))
        make_face()
    revolve(axis=Axis((9.398, 25.4, 5.588), (0, -1, 0)), revolution_arc=F5_T60_ANGLE, mode=Mode.SUBTRACT)

    # F5_s61 → F5_t62 (revolve, cut)
    with BuildSketch(Plane.XY.offset(5.588)):
        with BuildLine():
            ThreePointArc((9.652, 25.4), (10.0112102448, 25.2512102448), (10.16, 24.892))
            Line((10.16, 24.892), (10.16, 25.4))
            Line((10.16, 25.4), (9.652, 25.4))
        make_face()
    revolve(axis=Axis((9.652, 25.4, 5.588), (0, -1, 0)), revolution_arc=F5_T62_ANGLE, mode=Mode.SUBTRACT)


solid = f1_2.part
